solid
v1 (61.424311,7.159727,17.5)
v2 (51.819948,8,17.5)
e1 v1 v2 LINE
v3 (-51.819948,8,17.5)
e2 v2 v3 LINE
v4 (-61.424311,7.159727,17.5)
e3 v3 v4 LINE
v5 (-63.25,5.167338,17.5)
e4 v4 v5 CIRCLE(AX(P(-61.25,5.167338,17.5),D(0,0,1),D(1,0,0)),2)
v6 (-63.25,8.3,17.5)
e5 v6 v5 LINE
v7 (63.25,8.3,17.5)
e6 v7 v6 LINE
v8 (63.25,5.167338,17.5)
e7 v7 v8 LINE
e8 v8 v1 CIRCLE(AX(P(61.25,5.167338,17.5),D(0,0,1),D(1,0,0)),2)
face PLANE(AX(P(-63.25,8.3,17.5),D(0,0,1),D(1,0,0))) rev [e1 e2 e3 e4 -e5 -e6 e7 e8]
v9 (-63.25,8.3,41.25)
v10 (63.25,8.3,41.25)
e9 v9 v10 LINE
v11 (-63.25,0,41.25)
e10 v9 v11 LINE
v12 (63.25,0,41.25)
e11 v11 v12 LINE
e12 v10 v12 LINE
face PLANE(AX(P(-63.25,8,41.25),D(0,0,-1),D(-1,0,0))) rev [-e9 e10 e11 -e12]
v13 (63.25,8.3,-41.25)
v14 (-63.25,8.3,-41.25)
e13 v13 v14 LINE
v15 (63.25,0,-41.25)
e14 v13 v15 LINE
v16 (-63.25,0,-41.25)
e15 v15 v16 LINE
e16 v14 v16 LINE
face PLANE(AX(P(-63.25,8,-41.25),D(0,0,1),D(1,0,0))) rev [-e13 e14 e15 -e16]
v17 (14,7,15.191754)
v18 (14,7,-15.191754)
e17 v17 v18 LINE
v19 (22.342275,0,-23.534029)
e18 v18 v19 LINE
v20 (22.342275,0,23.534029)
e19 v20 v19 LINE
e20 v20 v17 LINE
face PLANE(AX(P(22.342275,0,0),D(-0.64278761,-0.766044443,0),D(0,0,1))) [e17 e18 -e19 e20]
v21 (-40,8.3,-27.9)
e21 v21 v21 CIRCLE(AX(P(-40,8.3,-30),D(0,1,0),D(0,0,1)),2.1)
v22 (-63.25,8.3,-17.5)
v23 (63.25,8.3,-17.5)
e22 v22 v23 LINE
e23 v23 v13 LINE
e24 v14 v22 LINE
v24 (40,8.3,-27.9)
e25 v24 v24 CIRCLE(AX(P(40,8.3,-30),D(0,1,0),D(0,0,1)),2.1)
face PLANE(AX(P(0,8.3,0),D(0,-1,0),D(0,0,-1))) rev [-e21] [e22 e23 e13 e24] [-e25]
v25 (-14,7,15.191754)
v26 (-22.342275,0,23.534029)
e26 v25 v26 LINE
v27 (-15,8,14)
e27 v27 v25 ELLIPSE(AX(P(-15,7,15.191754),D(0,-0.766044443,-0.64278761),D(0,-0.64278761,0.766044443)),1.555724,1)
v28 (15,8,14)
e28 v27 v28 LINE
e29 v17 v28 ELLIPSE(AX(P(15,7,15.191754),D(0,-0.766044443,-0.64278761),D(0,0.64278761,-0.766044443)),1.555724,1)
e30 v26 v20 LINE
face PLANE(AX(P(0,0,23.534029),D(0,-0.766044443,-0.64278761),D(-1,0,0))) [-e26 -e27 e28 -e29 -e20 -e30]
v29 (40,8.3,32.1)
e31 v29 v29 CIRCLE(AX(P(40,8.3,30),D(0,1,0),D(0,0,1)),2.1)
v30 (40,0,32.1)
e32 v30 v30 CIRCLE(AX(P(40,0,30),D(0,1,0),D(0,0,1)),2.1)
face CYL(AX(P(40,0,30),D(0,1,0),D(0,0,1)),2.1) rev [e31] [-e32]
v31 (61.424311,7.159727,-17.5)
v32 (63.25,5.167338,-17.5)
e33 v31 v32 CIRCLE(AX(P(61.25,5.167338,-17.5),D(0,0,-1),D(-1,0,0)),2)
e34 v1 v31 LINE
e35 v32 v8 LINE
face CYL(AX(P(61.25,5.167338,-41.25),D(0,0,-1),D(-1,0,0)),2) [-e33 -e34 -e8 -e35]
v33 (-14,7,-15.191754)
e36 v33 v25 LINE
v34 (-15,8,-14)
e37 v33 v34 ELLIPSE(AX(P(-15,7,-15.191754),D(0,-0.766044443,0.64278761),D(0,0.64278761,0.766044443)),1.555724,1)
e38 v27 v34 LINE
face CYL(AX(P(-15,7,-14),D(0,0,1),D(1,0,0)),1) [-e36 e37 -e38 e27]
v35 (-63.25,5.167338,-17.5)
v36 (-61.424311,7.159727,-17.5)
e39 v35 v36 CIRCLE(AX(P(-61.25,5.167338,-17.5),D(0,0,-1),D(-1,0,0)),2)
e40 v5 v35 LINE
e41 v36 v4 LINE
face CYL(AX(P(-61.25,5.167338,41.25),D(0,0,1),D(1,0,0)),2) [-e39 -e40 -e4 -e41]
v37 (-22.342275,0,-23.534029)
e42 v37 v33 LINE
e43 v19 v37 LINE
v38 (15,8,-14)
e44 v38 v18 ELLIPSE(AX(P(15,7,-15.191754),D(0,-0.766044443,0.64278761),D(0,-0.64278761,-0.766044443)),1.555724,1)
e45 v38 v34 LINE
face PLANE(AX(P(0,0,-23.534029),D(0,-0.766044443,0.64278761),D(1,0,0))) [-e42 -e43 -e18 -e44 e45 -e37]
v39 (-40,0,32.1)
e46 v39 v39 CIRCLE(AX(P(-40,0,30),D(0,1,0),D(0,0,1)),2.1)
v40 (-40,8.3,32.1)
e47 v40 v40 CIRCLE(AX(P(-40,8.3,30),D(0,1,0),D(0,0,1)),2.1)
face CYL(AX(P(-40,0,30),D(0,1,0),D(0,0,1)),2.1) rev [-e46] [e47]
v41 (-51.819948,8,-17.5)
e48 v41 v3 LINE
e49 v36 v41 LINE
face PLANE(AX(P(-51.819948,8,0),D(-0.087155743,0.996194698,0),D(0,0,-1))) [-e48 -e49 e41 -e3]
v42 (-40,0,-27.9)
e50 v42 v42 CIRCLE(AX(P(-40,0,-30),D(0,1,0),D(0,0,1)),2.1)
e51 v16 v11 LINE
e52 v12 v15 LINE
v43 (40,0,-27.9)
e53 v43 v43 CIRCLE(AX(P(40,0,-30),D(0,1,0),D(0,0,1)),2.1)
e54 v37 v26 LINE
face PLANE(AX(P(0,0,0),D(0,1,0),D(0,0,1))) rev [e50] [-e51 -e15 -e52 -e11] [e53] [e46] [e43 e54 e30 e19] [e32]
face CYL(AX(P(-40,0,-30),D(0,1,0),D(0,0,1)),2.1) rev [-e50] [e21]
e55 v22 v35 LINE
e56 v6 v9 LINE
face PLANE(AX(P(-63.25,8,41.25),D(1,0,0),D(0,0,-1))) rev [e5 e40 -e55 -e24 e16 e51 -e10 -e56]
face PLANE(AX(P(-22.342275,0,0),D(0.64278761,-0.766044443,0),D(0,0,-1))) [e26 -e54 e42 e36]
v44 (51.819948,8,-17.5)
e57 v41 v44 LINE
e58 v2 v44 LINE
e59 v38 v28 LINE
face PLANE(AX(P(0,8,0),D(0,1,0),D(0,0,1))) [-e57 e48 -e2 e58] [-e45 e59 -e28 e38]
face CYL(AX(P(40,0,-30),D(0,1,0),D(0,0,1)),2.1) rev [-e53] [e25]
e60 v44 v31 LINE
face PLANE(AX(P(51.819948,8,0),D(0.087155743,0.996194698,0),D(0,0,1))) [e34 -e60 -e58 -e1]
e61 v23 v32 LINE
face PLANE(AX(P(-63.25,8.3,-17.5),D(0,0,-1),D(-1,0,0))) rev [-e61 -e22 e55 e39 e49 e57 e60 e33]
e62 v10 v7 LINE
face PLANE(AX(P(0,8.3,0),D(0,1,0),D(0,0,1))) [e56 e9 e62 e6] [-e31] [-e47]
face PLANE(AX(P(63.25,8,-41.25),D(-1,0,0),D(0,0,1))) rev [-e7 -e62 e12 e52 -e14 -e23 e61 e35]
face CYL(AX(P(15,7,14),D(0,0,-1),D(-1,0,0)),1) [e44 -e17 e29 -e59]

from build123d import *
from OCP.BRepFilletAPI import BRepFilletAPI_MakeChamfer

# Parameters (mm, degrees)
SKETCH_1_W               = 126.5
SKETCH_1_H               = 82.5
SKETCH_1_W_2             = 28
SKETCH_1_H_2             = 28
EXTRUDE_1_DEPTH          = 8
SKETCH_2_W               = 126.5
SKETCH_2_H               = 23.75
EXTRUDE_2_DEPTH          = 0.3
CHAMFER_1_SIZE           = 1
CHAMFER_1_SIZE2          = 11.430052303
FILLET_1_R               = 2
FILLET_2_R               = 1
CUT_EXTRUDE_1_DEPTH      = 76.935005103
CUT_EXTRUDE_1_DEPTH_BACK = 76.935005103
SKETCH_3_R               = 2.1
CHAMFER_2_SIZE           = 8.342275148
CHAMFER_2_SIZE_2         = 7
CHAMFER_3_SIZE2          = 8
CHAMFER_3_SIZE           = 9.534028741


with BuildPart() as part:
    # Эскиз1 → Бобышка-Вытянуть1 (new body)
    with BuildSketch(Plane(origin=(0, 0, 0), x_dir=(1, 0, 0), z_dir=(0, 1, 0))):
        Rectangle(SKETCH_1_W, SKETCH_1_H)
        Rectangle(SKETCH_1_W_2, SKETCH_1_H_2, mode=Mode.SUBTRACT)
    extrude(amount=EXTRUDE_1_DEPTH)

    # Эскиз2 → Бобышка-Вытянуть2 (add)
    with BuildSketch(Plane(origin=(0, 8, 0), x_dir=(1, 0, 0), z_dir=(0, 1, 0))):
        with Locations((0, 29.375)):
            Rectangle(SKETCH_2_W, SKETCH_2_H)
        with Locations((0, -29.375)):
            Rectangle(SKETCH_2_W, SKETCH_2_H)
    extrude(amount=EXTRUDE_2_DEPTH)

    # Фаска1: one chamfer whose edges measure the first distance from different faces: ONE call of the kernel's chamfer builder (chamfer() names one face for all edges)
    chamfer_1_edges_1 = [part.edges().sort_by_distance(p)[0] for p in [
        (-63.25, 8, 0),
    ]]
    chamfer_1_side_1 = [part.faces().sort_by_distance(p)[0] for p in [
        (-63.25, 4.087708565, 0),
    ]]
    chamfer_1_edges_2 = [part.edges().sort_by_distance(p)[0] for p in [
        (63.25, 8, 0),
    ]]
    chamfer_1_side_2 = [part.faces().sort_by_distance(p)[0] for p in [
        (63.25, 4.087708565, 0),
    ]]
    chamfer_1 = BRepFilletAPI_MakeChamfer(part.part.solid().wrapped)
    for e in chamfer_1_edges_1:
        chamfer_1.Add(CHAMFER_1_SIZE, CHAMFER_1_SIZE2, e.wrapped, chamfer_1_side_1[0].wrapped)  # the first distance lies on this face
    for e in chamfer_1_edges_2:
        chamfer_1.Add(CHAMFER_1_SIZE, CHAMFER_1_SIZE2, e.wrapped, chamfer_1_side_2[0].wrapped)  # the first distance lies on this face
    add(Compound.cast(chamfer_1.Shape()), mode=Mode.REPLACE)

    # Скругление1
    fillet_1_edges = [part.edges().sort_by_distance(p)[0] for p in [
        (63.25, 7, 0),
        (-63.25, 7, 0),
    ]]
    fillet(fillet_1_edges, radius=FILLET_1_R)

    # Скругление2
    fillet_2_edges = [part.edges().sort_by_distance(p)[0] for p in [
        (-14, 8, 0),
        (14, 8, 0),
    ]]
    fillet(fillet_2_edges, radius=FILLET_2_R)

    # Эскиз3 → Вырез-Вытянуть1 (cut, two sides: drawn at the far end of the back side and taken through both)
    with BuildSketch(Plane(origin=(0, 8, 0), x_dir=(1, 0, 0), z_dir=(0, 1, 0)).offset(-CUT_EXTRUDE_1_DEPTH_BACK)):
        with Locations(Location((-40, 30, 0), (0, 0, 270))):
            Circle(SKETCH_3_R)
        with Locations(Location((40, 30, 0), (0, 0, 270))):
            Circle(SKETCH_3_R)
        with Locations(Location((-40, -30, 0), (0, 0, 270))):
            Circle(SKETCH_3_R)
        with Locations(Location((40, -30, 0), (0, 0, 270))):
            Circle(SKETCH_3_R)
    extrude(amount=CUT_EXTRUDE_1_DEPTH + CUT_EXTRUDE_1_DEPTH_BACK, mode=Mode.SUBTRACT)

    # Фаска2
    chamfer_2_edges_1 = [part.edges().sort_by_distance(p)[0] for p in [
        (14, 0, 0),
    ]]
    chamfer_2_side_1 = [part.faces().sort_by_distance(p)[0] for p in [
        (14.14, 0, 0),
    ]]
    chamfer_2_edges_2 = [part.edges().sort_by_distance(p)[0] for p in [
        (-14, 0, 0),
    ]]
    chamfer_2_side_2 = [part.faces().sort_by_distance(p)[0] for p in [
        (-14.14, 0, 0),
    ]]
    chamfer_2 = BRepFilletAPI_MakeChamfer(part.part.solid().wrapped)
    for e in chamfer_2_edges_1:
        chamfer_2.Add(CHAMFER_2_SIZE - 0.0001, CHAMFER_2_SIZE_2 - 0.0001, e.wrapped, chamfer_2_side_1[0].wrapped)
    for e in chamfer_2_edges_2:
        chamfer_2.Add(CHAMFER_2_SIZE - 0.0001, CHAMFER_2_SIZE_2 - 0.0001, e.wrapped, chamfer_2_side_2[0].wrapped)
    add(Compound.cast(chamfer_2.Shape()), mode=Mode.REPLACE)  # a hair under: the kernel refuses the full size

    # Фаска3
    chamfer_3_edges = [part.edges().sort_by_distance(p)[0] for p in [
        (0, 0, -14),
    ]]
    chamfer_3_side = [part.faces().sort_by_distance(p)[0] for p in [
        (0, 0, -14.16),
    ]]
    chamfer(chamfer_3_edges, length=CHAMFER_3_SIZE - 0.0001, length2=CHAMFER_3_SIZE2 - 0.0001, reference=chamfer_3_side[0])  # a hair under: the kernel refuses the full size
    chamfer_3_2_edges = [part.edges().sort_by_distance(p)[0] for p in [
        (0, 0, 14),
    ]]
    chamfer_3_2_side = [part.faces().sort_by_distance(p)[0] for p in [
        (0, 0, 14.16),
    ]]
    chamfer(chamfer_3_2_edges, length=CHAMFER_3_SIZE - 0.0001, length2=CHAMFER_3_SIZE2 - 0.0001, reference=chamfer_3_2_side[0])  # a hair under: the kernel refuses the full size


solid = part.part
